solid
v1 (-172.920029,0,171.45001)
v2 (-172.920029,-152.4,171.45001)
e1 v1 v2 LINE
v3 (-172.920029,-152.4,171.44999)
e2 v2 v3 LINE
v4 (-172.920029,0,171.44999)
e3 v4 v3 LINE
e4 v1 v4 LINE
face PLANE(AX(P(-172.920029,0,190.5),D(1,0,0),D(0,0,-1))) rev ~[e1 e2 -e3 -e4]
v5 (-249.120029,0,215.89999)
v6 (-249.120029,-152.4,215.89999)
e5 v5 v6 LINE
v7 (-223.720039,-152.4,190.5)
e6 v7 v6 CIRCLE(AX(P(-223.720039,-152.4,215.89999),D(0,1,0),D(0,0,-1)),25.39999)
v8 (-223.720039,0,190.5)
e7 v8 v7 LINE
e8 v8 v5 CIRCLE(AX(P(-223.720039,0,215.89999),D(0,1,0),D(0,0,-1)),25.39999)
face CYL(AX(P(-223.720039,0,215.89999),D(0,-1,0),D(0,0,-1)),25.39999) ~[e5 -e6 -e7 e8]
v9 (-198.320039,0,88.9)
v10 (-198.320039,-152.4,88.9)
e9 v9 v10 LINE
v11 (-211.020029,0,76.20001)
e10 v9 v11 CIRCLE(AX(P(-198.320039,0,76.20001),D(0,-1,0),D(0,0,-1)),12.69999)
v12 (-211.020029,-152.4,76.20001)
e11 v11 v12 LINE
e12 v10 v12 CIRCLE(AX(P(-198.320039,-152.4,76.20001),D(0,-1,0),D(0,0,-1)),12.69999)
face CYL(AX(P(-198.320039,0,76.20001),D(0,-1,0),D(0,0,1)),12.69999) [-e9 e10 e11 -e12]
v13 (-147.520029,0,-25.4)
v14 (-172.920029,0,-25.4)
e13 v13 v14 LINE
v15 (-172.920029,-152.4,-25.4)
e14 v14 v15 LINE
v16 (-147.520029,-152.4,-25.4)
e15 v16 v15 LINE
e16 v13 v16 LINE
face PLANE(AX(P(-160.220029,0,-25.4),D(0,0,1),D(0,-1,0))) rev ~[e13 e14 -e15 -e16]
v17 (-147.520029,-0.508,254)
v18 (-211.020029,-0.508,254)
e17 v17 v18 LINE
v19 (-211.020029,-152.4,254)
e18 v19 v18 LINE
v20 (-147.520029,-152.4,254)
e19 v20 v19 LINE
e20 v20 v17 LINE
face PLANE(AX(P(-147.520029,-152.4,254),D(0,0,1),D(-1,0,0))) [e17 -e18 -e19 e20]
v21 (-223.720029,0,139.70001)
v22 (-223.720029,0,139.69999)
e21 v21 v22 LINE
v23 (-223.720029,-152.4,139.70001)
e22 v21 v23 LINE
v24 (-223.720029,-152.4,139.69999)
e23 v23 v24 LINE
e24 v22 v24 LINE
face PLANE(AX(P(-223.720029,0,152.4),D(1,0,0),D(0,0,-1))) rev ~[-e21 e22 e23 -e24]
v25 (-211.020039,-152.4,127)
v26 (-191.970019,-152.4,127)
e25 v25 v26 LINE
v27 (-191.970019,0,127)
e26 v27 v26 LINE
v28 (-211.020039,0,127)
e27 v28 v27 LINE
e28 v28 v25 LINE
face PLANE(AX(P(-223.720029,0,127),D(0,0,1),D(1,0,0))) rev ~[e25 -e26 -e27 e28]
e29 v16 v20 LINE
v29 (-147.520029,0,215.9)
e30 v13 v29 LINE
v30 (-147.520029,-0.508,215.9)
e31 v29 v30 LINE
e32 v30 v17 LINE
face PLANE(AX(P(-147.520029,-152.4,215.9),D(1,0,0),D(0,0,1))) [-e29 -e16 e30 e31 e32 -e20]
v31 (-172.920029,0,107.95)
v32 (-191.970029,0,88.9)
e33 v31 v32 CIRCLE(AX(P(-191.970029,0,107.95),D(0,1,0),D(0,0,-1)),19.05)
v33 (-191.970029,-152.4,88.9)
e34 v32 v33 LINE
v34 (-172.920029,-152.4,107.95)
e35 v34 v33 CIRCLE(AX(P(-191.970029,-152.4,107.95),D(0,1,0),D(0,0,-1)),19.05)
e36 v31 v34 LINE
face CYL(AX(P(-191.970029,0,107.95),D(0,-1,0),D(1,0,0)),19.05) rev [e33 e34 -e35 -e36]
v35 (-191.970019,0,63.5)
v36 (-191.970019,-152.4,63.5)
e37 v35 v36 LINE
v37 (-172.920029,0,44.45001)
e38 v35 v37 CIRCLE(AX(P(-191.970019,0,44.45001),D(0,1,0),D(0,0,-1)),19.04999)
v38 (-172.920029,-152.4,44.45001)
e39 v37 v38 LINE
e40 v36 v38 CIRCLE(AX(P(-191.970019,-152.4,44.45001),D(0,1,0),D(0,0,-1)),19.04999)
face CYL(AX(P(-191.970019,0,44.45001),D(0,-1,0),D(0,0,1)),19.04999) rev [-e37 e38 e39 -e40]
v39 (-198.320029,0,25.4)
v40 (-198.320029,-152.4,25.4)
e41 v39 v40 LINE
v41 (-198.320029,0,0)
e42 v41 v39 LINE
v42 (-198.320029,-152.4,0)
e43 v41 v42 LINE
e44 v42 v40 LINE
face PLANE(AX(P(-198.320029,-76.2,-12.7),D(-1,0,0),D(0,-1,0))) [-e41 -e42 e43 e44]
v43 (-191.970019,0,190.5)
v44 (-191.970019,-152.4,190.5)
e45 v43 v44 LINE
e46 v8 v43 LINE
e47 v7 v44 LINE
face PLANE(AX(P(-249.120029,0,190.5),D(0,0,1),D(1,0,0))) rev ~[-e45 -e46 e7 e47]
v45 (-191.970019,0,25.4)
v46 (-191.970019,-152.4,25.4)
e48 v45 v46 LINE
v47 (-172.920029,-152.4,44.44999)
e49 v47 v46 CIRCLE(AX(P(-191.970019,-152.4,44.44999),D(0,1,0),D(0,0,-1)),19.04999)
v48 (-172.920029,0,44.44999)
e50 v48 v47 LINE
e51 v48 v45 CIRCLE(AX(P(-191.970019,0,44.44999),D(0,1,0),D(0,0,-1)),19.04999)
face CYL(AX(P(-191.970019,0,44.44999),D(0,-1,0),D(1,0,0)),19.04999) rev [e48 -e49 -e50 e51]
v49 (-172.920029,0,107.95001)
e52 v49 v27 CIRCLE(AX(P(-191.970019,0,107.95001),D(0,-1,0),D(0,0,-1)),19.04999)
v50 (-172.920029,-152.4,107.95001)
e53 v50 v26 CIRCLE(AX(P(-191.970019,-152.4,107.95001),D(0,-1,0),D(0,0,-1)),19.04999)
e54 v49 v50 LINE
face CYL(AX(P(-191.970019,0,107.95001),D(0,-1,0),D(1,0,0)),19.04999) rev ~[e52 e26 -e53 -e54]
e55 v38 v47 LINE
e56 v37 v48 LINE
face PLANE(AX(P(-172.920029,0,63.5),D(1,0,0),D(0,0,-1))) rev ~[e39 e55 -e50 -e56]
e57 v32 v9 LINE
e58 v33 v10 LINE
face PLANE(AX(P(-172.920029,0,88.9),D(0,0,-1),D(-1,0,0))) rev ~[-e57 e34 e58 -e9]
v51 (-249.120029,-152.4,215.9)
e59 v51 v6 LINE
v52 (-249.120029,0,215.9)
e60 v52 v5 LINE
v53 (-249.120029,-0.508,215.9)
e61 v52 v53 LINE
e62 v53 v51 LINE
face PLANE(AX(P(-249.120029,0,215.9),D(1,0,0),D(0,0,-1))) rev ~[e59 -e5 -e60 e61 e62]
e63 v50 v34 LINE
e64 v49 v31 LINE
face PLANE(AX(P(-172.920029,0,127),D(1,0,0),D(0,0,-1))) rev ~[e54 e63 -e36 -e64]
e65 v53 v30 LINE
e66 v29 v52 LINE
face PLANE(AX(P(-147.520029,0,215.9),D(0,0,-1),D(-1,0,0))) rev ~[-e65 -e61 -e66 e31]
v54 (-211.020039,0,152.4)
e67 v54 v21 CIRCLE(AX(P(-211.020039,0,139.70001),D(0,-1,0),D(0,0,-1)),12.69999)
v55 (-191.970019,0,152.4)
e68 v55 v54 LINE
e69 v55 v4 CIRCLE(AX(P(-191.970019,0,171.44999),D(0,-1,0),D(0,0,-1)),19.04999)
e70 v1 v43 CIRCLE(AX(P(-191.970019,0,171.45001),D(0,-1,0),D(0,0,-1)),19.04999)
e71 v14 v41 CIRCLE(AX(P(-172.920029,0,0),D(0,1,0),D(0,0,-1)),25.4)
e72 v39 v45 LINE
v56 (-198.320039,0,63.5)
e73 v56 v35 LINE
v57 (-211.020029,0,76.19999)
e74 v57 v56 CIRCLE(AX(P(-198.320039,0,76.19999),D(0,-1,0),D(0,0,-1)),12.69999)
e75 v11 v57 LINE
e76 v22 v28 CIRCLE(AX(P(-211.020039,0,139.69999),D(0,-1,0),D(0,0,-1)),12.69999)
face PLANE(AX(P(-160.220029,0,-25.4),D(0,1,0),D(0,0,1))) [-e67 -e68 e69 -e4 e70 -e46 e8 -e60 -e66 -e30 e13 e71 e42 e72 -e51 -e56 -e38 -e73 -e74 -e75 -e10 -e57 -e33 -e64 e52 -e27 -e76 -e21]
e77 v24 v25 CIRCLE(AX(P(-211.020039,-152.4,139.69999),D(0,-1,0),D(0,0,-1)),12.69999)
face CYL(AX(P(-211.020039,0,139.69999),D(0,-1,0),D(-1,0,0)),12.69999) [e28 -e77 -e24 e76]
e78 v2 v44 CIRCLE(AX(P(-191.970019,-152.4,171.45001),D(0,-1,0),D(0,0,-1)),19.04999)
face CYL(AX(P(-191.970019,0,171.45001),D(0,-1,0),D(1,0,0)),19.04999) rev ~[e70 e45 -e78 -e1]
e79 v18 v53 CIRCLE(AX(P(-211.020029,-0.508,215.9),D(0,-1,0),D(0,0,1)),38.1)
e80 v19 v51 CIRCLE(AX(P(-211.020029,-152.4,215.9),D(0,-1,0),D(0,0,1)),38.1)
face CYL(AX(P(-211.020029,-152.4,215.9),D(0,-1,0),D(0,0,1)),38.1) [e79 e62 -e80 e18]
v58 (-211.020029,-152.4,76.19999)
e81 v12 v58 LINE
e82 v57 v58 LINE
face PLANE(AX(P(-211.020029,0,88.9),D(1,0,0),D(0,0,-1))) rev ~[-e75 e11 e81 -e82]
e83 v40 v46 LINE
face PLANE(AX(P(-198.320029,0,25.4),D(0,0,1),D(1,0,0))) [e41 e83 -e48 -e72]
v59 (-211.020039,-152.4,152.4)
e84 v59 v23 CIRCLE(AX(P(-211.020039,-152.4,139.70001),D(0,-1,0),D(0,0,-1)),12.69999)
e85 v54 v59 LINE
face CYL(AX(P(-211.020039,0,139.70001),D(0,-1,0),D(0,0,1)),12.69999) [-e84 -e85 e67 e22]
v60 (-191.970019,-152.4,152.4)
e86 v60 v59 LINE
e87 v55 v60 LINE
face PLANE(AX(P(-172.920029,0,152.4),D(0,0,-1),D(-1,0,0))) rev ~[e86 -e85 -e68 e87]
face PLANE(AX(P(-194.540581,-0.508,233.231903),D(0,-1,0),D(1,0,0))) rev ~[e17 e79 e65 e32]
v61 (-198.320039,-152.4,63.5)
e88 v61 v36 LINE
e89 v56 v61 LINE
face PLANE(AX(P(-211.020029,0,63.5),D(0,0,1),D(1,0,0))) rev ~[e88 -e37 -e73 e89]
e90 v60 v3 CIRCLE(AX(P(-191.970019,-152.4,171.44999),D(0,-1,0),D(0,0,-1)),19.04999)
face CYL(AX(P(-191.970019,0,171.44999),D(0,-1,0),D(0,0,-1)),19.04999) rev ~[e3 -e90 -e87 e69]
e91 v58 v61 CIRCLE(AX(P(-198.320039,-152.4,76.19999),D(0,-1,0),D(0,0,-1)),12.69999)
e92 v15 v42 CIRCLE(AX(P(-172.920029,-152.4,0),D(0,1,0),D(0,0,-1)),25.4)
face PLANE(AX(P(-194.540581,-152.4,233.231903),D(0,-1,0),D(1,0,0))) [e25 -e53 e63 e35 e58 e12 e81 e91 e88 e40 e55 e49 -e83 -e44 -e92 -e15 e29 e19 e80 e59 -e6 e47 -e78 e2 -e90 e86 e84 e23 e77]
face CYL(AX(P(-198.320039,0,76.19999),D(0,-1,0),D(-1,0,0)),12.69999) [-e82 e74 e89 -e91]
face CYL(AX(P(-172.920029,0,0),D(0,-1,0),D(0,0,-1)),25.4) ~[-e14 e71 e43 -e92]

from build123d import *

# Parameters (mm, degrees)
F0_W     = 12.7
F0_H     = 25.4
F0_W_2   = 25.4
F1_DEPTH = 152.4
F2_W     = 152.4
F2_H     = 25.4
F3_DEPTH = 38.1
F4_R     = 25.4
F6_DEPTH = 151.892
F7_R     = 19.05
F8_R     = 19.04999
F9_R     = 19.04999
F10_R    = 12.69999
F11_R    = 25.39999


# Not quite as in the source:
# - a fillet or chamfer is up to 0.001 mm smaller than in the source, because OpenCascade refuses the exact size


with BuildPart() as f1:
    # F0 (on Front) → F1 (new body)
    with BuildSketch(Plane.XZ):
        Polygon((-147.5200289965, 215.9), (-172.9200289965, 215.9), (-249.1200289965, 215.9), (-249.1200289965, 190.5), (-172.9200289965, 190.5), (-172.9200289965, 152.4), (-223.7200289965, 152.4), (-223.7200289965, 127), (-172.9200289965, 127), (-172.9200289965, 88.9), (-211.0200289965, 88.9), (-211.0200289965, 63.5), (-172.9200289965, 63.5), (-172.9200289965, 25.4), (-172.9200289965, 0), (-160.2200289965, 0), (-147.5200289965, 0), (-147.5200289965, 63.5), (-147.5200289965, 88.9), (-147.5200289965, 127), (-147.5200289965, 152.4), (-147.5200289965, 190.5), align=None)
        with Locations((-153.8700289965, -12.7)):
            Rectangle(F0_W, F0_H)
        with Locations((-185.6200289965, 12.7)):
            Rectangle(F0_W_2, F0_H)
    extrude(amount=F1_DEPTH)

    # F2 (on face) → F3 (join)
    with BuildSketch(Plane(origin=(-160.2200289965, 0, 0), x_dir=(0, -1, 0), z_dir=(-1, 0, 0))):
        with Locations((76.2, -12.7)):
            Rectangle(F2_W, F2_H)
    extrude(amount=F3_DEPTH)

    # F4
    f4_edges = [f1.edges().sort_by_distance(p)[0] for p in [
        (-198.320029, -76.2, -25.4),
    ]]
    fillet(f4_edges, radius=F4_R)

    # F5 (on face) → F6 (join)
    with BuildSketch(Plane.XZ.offset(152.4)):
        with BuildLine():
            ThreePointArc((-211.0200289965, 254), (-237.9607973597, 242.8407683632), (-249.1200289965, 215.9))
            Line((-249.1200289965, 215.9), (-147.5200289965, 215.9))
            Line((-147.5200289965, 215.9), (-147.5200289965, 254))
            Line((-147.5200289965, 254), (-211.0200289965, 254))
        make_face()
    extrude(amount=-F6_DEPTH)

    # F7
    f7_edges = [f1.edges().sort_by_distance(p)[0] for p in [
        (-172.920029, -76.2, 88.9),
    ]]
    fillet(f7_edges, radius=F7_R)

    # F8 (radius 19.05 in the source; OpenCascade refuses exactly that, so slightly less here)
    f8_edges = [f1.edges().sort_by_distance(p)[0] for p in [
        (-172.920029, -76.2, 190.5),
        (-172.920029, -76.2, 127),
    ]]
    fillet(f8_edges, radius=F8_R)

    # F9 (radius 19.05 in the source; OpenCascade refuses exactly that, so slightly less here)
    f9_edges = [f1.edges().sort_by_distance(p)[0] for p in [
        (-172.920029, -76.2, 152.4),
        (-172.920029, -76.2, 25.4),
        (-172.920029, -76.2, 63.5),
    ]]
    fillet(f9_edges, radius=F9_R)

    # F10 (radius 12.7 in the source; OpenCascade refuses exactly that, so slightly less here)
    f10_edges = [f1.edges().sort_by_distance(p)[0] for p in [
        (-223.720029, -76.2, 152.4),
        (-223.720029, -76.2, 127),
        (-211.020029, -76.2, 88.9),
        (-211.020029, -76.2, 63.5),
    ]]
    fillet(f10_edges, radius=F10_R)

    # F11 (radius 25.4 in the source; OpenCascade refuses exactly that, so slightly less here)
    f11_edges = [f1.edges().sort_by_distance(p)[0] for p in [
        (-249.120029, -76.2, 190.5),
    ]]
    fillet(f11_edges, radius=F11_R)


solid = f1.part
